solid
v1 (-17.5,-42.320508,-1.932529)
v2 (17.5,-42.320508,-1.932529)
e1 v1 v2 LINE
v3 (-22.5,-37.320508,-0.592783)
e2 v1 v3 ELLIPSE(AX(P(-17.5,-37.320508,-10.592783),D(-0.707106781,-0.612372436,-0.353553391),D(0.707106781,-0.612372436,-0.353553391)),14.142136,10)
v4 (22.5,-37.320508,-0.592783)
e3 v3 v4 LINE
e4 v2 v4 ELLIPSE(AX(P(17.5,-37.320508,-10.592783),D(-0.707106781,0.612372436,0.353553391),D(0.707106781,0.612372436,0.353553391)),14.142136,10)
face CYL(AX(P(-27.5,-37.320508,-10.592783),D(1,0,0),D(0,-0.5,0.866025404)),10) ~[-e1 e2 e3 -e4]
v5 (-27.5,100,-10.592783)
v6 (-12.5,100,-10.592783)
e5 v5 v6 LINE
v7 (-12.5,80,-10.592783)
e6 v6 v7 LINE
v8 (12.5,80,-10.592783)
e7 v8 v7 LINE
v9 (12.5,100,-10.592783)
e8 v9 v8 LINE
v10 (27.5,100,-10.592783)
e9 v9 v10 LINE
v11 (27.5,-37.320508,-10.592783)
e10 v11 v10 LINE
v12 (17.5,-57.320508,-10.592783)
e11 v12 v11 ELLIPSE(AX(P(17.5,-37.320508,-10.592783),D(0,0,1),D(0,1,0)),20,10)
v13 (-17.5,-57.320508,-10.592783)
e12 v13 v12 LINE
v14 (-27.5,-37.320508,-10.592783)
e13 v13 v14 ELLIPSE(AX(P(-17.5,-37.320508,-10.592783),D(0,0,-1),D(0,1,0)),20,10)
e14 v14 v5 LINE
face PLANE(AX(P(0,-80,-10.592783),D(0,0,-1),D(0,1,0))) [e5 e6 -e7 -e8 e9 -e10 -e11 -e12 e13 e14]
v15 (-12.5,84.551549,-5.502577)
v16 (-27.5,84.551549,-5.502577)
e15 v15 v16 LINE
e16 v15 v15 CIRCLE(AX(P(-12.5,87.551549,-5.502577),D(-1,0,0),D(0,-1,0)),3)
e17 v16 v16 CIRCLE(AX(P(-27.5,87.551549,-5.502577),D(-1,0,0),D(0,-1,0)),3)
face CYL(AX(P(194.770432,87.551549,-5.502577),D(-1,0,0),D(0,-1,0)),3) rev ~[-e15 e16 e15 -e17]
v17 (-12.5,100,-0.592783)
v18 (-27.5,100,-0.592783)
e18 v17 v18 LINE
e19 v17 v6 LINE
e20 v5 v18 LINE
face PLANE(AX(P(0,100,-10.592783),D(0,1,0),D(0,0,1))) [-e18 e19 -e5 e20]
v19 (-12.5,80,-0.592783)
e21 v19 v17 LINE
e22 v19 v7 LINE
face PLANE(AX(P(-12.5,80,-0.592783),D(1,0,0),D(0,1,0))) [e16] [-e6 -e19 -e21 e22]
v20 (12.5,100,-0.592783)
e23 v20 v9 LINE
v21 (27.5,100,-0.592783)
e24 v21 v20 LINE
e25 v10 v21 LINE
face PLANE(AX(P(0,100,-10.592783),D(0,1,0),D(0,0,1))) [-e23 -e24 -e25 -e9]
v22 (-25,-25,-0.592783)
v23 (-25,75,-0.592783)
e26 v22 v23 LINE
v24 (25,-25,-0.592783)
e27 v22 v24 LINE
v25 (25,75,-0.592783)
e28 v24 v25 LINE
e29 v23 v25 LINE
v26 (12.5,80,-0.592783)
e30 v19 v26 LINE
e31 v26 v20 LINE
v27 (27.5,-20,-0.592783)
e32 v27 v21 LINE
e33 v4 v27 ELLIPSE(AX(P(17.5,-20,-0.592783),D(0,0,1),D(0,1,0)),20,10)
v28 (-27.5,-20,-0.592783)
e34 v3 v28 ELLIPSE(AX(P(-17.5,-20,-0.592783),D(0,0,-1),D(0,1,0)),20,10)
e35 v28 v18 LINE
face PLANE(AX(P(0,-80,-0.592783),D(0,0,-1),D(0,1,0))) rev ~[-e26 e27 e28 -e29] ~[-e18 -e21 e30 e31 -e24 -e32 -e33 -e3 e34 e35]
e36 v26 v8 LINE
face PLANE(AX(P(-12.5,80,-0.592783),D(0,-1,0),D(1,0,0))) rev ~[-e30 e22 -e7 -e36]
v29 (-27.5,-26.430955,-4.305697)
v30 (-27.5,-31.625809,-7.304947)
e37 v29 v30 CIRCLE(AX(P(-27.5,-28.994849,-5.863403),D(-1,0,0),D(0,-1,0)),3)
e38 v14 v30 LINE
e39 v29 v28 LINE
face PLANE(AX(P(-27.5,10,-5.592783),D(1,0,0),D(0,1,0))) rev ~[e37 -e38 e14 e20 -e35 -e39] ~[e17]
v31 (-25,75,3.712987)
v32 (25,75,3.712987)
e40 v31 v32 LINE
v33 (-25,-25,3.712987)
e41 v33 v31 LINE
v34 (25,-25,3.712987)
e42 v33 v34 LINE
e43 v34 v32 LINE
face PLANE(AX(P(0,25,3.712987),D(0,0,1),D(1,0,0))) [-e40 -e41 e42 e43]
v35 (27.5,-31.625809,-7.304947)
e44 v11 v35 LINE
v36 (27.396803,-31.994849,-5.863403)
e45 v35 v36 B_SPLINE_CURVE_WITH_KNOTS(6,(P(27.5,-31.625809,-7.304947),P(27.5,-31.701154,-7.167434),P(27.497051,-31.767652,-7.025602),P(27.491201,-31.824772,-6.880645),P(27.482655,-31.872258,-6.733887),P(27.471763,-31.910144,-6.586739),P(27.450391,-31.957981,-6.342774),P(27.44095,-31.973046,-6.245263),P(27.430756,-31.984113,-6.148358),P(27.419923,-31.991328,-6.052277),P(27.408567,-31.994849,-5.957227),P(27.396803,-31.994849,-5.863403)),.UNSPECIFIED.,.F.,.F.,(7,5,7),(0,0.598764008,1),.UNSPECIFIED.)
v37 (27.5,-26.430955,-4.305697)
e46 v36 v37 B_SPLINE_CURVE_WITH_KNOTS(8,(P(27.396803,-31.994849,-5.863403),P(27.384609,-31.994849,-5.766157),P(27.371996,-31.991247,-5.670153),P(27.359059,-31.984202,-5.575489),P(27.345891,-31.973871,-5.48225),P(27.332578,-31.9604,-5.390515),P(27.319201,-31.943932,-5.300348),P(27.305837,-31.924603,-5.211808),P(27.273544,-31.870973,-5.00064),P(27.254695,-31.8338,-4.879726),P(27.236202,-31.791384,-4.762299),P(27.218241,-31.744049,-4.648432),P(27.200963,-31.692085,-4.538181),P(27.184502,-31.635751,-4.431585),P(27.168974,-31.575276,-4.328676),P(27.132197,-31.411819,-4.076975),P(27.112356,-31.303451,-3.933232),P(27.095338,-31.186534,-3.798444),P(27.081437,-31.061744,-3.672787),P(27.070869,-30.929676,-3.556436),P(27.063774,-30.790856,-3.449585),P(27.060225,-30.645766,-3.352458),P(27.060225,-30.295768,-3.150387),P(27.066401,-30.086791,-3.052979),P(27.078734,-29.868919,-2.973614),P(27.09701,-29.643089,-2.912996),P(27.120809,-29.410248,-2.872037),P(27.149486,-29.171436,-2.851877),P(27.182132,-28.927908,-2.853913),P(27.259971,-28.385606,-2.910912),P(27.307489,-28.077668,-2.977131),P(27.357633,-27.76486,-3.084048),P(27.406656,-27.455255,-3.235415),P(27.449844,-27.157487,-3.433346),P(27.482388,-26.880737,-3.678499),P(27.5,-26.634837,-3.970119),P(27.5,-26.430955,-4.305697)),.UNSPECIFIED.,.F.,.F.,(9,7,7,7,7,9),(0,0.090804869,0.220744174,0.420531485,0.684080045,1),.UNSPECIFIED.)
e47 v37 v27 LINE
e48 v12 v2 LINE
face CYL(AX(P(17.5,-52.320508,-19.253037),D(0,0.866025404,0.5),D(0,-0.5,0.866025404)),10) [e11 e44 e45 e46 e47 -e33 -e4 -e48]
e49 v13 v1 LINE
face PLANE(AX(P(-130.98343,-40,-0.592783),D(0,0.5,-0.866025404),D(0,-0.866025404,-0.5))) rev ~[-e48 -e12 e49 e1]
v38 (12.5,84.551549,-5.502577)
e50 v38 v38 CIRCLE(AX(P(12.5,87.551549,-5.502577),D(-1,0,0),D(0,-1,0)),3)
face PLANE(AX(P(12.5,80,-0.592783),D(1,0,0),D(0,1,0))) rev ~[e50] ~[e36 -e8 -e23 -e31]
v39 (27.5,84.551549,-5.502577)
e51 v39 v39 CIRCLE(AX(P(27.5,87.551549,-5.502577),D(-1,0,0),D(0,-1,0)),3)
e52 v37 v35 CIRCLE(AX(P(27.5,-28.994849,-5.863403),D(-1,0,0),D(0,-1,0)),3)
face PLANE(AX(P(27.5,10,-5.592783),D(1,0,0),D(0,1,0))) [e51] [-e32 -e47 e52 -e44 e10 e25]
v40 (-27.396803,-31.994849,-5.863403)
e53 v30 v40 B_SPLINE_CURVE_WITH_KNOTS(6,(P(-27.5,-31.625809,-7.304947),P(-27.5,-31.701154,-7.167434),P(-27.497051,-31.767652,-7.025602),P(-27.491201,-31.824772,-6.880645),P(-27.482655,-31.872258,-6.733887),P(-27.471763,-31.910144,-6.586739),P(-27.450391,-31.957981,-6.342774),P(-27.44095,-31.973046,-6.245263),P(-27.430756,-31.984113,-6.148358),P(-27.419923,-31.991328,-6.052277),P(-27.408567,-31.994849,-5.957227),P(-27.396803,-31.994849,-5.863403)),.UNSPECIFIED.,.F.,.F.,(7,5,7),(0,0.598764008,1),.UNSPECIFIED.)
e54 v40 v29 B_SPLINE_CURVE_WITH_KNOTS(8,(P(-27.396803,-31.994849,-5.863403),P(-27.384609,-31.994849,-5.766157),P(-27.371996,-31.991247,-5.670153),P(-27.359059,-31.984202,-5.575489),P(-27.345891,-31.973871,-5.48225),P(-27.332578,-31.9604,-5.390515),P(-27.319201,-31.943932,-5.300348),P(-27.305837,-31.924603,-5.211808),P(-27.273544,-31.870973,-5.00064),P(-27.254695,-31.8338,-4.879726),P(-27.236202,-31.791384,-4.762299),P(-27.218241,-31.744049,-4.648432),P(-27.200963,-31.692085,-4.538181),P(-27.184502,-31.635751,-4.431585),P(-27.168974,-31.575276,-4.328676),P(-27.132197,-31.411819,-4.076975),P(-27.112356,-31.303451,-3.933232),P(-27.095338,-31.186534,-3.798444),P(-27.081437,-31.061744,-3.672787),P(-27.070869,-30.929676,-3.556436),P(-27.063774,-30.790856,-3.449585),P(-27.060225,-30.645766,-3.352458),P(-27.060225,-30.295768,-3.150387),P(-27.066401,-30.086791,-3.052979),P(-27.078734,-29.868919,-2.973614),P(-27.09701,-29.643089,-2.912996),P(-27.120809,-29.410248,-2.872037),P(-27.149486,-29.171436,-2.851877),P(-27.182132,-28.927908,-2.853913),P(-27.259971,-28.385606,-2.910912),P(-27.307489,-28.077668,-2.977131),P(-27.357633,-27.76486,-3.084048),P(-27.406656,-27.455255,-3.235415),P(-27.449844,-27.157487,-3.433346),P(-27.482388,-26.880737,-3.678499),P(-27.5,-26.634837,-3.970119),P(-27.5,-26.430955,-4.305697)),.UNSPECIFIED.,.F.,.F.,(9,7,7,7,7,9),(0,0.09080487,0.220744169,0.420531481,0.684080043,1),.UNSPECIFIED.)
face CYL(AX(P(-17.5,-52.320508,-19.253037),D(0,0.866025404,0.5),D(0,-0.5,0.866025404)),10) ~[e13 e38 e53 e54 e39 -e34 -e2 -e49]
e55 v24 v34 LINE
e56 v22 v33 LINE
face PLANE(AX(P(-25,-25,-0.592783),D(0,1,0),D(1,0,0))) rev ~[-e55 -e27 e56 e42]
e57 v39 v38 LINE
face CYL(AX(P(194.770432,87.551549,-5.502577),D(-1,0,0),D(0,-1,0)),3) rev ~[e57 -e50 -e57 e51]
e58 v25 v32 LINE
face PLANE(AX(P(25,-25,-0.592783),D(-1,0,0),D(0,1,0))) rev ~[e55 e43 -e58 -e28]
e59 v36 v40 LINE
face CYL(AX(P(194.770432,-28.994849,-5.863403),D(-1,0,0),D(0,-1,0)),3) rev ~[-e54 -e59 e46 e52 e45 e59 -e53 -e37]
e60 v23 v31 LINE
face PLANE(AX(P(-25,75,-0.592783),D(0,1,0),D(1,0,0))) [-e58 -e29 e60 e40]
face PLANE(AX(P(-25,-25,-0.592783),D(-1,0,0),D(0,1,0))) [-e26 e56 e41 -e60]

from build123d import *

# Parameters (mm, degrees)
F0_W        = 180
F0_H        = 10
F1_DEPTH    = 27.5
F2_T1_DEPTH = 261.9668603717
F3_R        = 10
F4_W        = 50
F4_H        = 100
F5_DEPTH    = 4.30577
F6_W        = 25
F6_H        = 20
F7_DEPTH    = 25
F9_D        = 6
F10_D       = 6


# Not quite as in the source:
# - a fillet or chamfer that OpenCascade refuses, or shapes differently, is made with other operations: its cross-section is extruded or revolved along the edge and cut away or added


with BuildPart() as f1:
    # F0 (on Right) → F1 (new body, symmetric)
    with BuildSketch(Plane.YZ):
        with Locations((10, -5.5927829817)):
            Rectangle(F0_W, F0_H)
    extrude(amount=F1_DEPTH, both=True)

    # F2: chamfer of 40 x 23.0940107676 on 1 edges, made by hand

    # F2_s2 → F2_t1 (cut)
    with BuildSketch(Plane.YZ.offset(-130.9834301858)):
        Polygon((-40, -0.5927829817), (-80, -23.6867937493), (-80, -0.5927829817), align=None)
    extrude(amount=F2_T1_DEPTH, mode=Mode.SUBTRACT)

    # F3
    f3_edges = [f1.edges().sort_by_distance(p)[0] for p in [
        (-27.5, -48.660254, -5.592783),
        (27.5, -48.660254, -5.592783),
        (0, -40, -0.592783),
    ]]
    fillet(f3_edges, radius=F3_R)

    # F4 (on face) → F5 (join)
    with BuildSketch(Plane.XY.offset(-0.5927829817)):
        with Locations((0, 25)):
            Rectangle(F4_W, F4_H)
    extrude(amount=F5_DEPTH)

    # F6 (on face) → F7 (cut)
    with BuildSketch(Plane.XY.offset(-0.5927829817)):
        with Locations((0, 90)):
            Rectangle(F6_W, F6_H)
    extrude(amount=-F7_DEPTH, mode=Mode.SUBTRACT)

    # F9 (through all)
    with Locations(Plane.YZ.offset(27.5)):
        with Locations((-28.9948489517, -5.8634025045)):
            Hole(F9_D / 2)

    # F10 (through all)
    with Locations(Plane.YZ.offset(27.5)):
        with Locations((87.551549077, -5.5025774054)):
            Hole(F10_D / 2)


solid = f1.part
